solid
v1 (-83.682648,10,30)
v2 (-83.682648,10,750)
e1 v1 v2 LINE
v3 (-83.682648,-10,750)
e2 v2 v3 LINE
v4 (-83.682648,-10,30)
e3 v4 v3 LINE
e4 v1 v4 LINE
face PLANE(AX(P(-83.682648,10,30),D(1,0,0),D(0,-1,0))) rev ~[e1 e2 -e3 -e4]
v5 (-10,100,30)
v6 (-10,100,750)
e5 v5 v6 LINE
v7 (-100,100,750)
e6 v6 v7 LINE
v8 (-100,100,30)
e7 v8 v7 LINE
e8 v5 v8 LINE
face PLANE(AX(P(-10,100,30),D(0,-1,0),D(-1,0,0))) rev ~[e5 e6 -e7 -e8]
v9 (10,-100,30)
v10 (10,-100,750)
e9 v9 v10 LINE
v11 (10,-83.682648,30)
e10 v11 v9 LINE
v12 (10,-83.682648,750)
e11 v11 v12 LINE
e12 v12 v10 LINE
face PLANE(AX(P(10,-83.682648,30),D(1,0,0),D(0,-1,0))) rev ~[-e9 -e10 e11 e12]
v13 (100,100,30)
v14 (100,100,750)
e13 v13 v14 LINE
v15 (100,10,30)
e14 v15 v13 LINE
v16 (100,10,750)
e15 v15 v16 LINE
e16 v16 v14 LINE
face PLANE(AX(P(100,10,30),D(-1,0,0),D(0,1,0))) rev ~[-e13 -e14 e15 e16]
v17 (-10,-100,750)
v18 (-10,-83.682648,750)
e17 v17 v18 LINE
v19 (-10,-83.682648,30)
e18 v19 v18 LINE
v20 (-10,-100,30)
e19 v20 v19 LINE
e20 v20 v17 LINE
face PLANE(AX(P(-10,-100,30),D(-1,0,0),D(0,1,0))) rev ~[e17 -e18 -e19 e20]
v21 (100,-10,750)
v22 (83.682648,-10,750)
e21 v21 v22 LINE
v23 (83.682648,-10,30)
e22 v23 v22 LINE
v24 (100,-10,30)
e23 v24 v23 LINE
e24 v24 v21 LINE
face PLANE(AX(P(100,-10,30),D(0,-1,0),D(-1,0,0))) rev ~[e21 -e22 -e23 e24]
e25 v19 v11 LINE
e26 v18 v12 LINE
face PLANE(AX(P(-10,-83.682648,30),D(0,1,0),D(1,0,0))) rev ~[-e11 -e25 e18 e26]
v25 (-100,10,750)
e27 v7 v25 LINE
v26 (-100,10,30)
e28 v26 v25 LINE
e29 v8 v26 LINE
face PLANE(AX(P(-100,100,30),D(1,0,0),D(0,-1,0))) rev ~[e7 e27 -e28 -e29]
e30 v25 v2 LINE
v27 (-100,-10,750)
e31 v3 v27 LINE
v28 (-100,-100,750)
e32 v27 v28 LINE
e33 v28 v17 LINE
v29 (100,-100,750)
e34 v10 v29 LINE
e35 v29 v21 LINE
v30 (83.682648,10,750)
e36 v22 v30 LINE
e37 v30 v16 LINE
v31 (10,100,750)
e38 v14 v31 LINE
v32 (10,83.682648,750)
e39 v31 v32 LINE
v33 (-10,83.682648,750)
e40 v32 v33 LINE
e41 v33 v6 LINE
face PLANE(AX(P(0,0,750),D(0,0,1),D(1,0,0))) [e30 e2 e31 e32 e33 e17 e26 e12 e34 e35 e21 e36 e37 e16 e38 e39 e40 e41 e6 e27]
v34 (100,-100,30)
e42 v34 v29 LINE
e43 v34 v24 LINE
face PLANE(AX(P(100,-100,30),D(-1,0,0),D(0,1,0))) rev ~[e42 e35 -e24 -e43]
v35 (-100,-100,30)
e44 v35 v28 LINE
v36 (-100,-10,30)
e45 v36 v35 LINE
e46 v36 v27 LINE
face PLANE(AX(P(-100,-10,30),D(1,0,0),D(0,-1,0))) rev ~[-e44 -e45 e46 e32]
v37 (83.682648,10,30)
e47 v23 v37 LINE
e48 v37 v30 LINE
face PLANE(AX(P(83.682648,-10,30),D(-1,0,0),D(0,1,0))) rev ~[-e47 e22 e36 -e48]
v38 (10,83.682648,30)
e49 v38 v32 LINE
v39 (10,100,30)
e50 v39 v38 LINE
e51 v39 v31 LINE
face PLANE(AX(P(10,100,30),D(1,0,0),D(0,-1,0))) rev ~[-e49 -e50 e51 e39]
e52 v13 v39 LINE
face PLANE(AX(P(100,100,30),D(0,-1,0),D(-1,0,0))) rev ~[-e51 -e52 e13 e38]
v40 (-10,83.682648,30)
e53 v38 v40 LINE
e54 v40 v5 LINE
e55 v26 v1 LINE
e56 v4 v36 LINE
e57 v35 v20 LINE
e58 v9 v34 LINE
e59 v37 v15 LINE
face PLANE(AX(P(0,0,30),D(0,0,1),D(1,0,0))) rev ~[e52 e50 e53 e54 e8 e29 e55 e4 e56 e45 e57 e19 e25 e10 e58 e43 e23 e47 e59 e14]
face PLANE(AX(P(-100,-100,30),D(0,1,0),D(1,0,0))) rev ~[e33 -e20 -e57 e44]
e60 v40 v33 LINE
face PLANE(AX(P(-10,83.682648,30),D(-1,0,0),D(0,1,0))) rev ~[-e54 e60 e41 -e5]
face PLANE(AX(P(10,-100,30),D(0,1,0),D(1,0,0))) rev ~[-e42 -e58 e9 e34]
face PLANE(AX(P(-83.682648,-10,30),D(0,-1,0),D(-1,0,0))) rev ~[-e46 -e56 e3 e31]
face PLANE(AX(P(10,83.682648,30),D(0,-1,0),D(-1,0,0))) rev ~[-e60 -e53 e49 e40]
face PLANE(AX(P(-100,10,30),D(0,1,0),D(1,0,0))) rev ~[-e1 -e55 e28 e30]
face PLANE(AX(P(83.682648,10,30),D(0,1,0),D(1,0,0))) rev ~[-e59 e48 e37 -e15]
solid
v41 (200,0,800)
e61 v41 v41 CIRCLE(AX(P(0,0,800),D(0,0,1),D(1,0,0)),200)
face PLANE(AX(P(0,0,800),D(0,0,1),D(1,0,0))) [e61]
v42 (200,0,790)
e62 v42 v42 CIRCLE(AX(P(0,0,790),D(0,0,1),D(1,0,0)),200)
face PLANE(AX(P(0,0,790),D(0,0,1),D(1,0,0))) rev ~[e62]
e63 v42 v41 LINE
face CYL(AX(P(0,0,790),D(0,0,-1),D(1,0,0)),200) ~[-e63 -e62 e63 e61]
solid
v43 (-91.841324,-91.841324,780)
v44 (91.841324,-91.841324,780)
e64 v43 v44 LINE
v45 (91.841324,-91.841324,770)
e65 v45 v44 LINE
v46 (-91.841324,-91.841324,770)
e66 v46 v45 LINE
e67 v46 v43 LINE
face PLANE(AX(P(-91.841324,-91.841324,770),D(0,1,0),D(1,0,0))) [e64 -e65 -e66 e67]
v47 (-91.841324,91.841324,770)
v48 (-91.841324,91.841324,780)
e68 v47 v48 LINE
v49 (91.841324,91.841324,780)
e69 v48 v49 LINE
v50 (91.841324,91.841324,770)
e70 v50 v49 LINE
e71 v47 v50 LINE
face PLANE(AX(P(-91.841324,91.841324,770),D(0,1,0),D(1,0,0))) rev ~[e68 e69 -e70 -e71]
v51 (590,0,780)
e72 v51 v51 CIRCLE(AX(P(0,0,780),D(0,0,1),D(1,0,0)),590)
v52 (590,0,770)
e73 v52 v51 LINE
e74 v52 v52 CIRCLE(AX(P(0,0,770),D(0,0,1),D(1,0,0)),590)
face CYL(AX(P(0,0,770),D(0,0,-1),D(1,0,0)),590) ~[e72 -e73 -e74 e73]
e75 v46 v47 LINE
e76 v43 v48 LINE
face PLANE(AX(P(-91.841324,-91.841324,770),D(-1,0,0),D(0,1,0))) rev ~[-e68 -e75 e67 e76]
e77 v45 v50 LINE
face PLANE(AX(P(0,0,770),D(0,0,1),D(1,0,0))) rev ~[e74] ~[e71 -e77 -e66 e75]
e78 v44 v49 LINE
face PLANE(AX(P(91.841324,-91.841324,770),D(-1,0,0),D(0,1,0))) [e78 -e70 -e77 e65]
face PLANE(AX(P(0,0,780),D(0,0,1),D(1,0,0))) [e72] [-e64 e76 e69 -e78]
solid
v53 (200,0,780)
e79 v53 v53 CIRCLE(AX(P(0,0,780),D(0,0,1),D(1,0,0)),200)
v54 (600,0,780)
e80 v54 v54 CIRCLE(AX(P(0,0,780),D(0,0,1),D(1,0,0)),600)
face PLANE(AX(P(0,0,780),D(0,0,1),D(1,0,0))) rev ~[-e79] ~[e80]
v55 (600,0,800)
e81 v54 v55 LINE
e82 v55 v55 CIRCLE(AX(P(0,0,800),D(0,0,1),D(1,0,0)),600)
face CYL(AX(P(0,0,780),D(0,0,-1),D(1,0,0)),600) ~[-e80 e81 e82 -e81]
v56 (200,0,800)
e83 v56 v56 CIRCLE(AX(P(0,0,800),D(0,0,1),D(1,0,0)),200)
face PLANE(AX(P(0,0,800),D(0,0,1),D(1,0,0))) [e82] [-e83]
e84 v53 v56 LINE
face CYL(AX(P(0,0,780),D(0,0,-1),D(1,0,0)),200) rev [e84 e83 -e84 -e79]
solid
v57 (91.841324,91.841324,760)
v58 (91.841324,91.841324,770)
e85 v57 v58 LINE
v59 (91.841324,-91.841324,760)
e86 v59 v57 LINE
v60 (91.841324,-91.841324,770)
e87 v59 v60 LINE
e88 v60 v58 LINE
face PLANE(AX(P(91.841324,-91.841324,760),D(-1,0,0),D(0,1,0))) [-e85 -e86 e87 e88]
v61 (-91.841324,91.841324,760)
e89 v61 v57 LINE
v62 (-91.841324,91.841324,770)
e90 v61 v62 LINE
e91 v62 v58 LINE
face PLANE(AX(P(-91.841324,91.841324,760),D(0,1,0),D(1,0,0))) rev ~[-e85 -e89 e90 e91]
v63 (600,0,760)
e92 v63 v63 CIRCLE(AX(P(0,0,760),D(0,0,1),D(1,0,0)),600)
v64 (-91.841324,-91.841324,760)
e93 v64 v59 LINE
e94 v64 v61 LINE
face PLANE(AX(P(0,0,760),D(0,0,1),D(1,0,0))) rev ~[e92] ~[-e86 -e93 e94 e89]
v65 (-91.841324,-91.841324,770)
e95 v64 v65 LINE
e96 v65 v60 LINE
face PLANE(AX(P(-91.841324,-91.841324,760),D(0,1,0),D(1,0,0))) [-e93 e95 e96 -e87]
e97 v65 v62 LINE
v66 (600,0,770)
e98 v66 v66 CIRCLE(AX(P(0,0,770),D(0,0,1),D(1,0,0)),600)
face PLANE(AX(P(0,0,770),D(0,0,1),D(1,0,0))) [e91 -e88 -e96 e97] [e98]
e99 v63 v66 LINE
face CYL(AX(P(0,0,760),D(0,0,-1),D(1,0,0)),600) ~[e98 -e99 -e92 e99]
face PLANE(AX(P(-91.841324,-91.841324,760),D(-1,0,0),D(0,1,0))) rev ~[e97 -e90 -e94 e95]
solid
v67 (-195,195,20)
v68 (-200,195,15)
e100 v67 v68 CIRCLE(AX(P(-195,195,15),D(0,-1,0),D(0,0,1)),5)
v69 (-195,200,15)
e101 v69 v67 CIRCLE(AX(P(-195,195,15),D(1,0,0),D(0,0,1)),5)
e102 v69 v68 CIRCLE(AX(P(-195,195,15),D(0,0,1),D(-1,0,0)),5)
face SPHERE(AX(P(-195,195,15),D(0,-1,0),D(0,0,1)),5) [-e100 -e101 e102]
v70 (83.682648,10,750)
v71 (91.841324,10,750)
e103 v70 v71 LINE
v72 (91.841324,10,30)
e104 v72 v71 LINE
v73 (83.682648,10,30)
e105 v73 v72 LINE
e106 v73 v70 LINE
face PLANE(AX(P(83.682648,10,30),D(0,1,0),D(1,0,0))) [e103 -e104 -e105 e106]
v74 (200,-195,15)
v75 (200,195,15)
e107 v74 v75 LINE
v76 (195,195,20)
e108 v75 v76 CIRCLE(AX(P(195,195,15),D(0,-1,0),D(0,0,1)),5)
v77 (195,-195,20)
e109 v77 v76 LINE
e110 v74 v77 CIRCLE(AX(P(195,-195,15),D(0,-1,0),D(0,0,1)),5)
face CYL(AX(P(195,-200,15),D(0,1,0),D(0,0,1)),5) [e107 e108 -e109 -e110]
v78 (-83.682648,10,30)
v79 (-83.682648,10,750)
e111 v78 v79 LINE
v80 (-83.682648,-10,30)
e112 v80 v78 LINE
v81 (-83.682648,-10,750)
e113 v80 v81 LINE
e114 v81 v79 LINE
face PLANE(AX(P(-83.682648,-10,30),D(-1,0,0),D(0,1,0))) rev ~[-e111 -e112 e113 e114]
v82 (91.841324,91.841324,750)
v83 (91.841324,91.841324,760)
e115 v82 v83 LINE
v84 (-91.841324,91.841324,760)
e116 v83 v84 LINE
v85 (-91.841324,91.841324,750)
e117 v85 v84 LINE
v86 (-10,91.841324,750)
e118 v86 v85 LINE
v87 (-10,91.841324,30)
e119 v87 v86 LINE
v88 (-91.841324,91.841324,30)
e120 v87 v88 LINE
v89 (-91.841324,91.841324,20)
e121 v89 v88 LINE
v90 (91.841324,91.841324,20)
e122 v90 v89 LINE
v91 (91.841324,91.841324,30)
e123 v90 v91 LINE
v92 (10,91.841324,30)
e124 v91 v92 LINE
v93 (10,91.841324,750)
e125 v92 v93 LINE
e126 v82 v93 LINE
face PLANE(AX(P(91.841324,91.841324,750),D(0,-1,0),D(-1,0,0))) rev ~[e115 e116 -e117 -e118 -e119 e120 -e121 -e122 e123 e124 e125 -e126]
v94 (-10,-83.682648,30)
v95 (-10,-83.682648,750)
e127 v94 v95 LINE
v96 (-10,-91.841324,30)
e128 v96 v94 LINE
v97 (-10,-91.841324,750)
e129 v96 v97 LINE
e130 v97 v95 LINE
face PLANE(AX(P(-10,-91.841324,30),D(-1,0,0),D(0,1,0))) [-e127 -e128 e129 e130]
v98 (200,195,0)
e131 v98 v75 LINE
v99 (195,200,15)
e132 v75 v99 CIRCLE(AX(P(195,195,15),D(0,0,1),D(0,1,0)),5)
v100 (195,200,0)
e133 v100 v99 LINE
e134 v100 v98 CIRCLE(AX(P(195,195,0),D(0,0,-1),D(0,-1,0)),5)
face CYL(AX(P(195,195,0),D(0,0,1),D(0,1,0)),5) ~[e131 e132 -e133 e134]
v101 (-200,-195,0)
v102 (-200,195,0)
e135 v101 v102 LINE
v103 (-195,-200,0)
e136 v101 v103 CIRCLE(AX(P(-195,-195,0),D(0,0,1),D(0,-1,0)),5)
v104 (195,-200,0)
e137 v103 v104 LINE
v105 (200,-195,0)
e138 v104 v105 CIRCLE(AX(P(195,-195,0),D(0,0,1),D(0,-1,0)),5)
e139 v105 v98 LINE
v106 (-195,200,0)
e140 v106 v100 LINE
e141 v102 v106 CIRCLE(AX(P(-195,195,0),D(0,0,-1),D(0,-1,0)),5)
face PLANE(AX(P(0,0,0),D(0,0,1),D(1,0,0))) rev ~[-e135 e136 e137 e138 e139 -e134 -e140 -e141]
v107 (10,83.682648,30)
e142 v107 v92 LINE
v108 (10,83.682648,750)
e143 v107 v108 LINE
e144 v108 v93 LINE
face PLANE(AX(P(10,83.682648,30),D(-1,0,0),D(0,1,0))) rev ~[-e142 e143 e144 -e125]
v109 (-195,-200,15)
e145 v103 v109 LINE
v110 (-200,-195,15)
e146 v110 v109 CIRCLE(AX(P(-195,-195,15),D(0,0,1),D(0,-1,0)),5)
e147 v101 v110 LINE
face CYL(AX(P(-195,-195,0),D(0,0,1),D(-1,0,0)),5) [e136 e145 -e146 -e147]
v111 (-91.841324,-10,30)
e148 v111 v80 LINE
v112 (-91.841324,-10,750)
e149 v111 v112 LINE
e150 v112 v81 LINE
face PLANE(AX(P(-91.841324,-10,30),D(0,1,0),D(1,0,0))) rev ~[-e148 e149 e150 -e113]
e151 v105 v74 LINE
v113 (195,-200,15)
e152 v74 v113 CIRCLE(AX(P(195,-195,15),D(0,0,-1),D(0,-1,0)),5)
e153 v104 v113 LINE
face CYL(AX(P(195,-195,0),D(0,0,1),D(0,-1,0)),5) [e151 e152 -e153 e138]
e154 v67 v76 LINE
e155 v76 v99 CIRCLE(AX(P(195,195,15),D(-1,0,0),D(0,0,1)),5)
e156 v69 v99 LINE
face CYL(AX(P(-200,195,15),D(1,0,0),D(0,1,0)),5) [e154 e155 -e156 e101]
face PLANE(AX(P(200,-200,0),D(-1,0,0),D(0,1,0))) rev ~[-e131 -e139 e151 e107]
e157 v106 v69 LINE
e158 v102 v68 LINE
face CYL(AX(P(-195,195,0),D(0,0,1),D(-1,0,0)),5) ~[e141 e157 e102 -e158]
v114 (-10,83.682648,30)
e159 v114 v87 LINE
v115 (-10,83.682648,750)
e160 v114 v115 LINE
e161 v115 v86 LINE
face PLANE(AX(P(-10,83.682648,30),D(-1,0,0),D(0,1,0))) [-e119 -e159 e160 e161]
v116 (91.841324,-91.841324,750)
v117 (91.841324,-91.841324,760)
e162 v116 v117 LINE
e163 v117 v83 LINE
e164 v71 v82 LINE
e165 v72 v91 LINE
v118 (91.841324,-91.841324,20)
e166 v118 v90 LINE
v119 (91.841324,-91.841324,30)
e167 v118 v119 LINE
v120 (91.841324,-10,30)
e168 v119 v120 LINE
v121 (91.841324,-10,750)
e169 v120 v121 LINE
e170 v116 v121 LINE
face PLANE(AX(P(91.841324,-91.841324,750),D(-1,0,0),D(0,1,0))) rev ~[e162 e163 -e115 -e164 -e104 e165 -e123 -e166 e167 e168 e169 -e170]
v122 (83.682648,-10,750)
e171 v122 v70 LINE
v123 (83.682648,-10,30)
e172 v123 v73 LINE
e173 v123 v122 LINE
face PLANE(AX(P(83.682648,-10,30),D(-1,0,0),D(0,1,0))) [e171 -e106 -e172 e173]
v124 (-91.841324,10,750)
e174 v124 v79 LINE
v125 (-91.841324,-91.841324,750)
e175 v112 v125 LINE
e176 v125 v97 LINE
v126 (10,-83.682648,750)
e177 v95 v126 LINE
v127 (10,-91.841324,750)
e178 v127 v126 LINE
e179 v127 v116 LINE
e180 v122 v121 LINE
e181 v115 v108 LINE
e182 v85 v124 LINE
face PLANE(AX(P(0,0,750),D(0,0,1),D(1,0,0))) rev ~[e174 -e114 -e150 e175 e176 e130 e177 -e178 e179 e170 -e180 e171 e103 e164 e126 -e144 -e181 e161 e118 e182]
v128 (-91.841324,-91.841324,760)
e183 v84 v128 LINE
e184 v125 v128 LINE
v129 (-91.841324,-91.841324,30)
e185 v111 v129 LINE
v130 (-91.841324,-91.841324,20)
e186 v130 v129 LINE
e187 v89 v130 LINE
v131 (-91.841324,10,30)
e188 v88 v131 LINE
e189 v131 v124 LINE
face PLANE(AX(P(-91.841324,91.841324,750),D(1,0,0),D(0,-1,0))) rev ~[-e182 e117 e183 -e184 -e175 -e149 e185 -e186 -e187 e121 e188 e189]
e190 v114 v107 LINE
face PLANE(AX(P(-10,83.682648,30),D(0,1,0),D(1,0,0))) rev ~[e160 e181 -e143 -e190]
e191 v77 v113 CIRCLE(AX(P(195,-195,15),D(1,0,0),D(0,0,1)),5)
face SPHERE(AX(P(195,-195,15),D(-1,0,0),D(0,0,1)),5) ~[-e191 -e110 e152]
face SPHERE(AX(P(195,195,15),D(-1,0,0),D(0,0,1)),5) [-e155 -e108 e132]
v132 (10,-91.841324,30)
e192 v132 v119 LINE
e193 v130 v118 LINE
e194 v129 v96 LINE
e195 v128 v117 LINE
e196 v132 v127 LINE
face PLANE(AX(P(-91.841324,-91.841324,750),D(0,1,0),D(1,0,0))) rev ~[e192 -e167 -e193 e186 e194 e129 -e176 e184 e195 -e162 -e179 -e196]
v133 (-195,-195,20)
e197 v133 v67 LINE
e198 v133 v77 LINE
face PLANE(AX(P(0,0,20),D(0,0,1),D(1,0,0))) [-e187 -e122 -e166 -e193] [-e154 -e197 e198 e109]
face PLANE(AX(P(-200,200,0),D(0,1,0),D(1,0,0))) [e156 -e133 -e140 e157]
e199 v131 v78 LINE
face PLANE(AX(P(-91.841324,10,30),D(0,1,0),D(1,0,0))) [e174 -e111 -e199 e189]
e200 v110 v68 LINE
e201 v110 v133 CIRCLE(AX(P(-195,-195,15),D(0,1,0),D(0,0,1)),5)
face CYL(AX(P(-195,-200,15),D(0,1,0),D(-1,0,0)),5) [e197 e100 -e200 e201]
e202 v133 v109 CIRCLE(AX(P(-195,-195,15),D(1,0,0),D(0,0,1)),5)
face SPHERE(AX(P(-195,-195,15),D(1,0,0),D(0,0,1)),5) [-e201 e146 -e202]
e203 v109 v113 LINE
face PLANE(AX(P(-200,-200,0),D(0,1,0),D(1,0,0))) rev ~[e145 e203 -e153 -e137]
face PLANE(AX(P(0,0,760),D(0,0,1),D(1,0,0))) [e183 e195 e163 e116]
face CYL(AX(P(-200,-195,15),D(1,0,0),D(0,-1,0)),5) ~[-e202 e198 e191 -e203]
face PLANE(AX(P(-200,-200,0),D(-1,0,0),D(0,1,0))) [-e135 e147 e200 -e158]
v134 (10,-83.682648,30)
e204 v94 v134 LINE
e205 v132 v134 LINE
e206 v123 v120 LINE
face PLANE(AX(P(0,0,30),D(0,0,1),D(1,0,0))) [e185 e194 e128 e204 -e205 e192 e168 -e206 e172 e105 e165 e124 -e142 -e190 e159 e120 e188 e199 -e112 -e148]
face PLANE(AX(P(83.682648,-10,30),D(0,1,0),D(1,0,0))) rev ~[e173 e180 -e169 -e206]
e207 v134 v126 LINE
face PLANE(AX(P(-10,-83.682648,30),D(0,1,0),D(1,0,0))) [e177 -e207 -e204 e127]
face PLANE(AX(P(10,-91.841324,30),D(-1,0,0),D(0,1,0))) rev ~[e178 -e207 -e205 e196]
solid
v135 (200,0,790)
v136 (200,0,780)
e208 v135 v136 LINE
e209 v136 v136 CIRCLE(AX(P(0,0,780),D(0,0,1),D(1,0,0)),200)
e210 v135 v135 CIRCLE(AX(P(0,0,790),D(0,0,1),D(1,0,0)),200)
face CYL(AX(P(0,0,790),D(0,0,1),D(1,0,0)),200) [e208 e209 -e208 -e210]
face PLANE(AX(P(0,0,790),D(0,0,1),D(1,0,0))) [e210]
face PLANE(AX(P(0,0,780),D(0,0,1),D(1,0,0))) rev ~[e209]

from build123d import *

# Parameters (mm, degrees)
F1_START  = 30
F1_DEPTH  = 720
F2_START  = 30
F0_W      = 20
F0_H      = 8.1586758983
F2_DEPTH  = 720
F0_W_2    = 8.1586758983
F0_H_2    = 20
F3_START  = 20
F3_DEPTH  = 10
F4_START  = 750
F4_DEPTH  = 10
F0_W_3    = 400
F0_H_3    = 400
F5_DEPTH  = 20
F7_START  = 20
F6_R      = 600
F6_R_2    = 590
F6_R_3    = 200
F7_DEPTH  = 20
F8_START  = 10
F6_W      = 183.6826482035
F6_H      = 183.6826482035
F8_DEPTH  = 10
F9_DEPTH  = 10
F10_START = 30
F10_DEPTH = 10
F11_DEPTH = 10
F12_R     = 5


with BuildPart() as f1:
    # F0 (on Top) → F1 (new body)
    with BuildSketch(Plane.XY.offset(F1_START)):
        Polygon((10, 83.6826482035), (-10, 83.6826482035), (-10, 91.8413241017), (-91.8413241017, 91.8413241017), (-91.8413241017, 10), (-83.6826482035, 10), (-83.6826482035, -10), (-91.8413241017, -10), (-91.8413241017, -91.8413241017), (-10, -91.8413241017), (-10, -83.6826482035), (10, -83.6826482035), (10, -91.8413241017), (91.8413241017, -91.8413241017), (91.8413241017, -10), (83.6826482035, -10), (83.6826482035, 10), (91.8413241017, 10), (91.8413241017, 91.8413241017), (10, 91.8413241017), align=None)
        Polygon((-91.8413241017, 91.8413241017), (-10, 91.8413241017), (-10, 100), (-100, 100), (-100, 10), (-91.8413241017, 10), align=None)
        Polygon((-91.8413241017, -91.8413241017), (-91.8413241017, -10), (-100, -10), (-100, -100), (-10, -100), (-10, -91.8413241017), align=None)
        Polygon((100, -10), (91.8413241017, -10), (91.8413241017, -91.8413241017), (10, -91.8413241017), (10, -100), (100, -100), align=None)
        Polygon((10, 100), (10, 91.8413241017), (91.8413241017, 91.8413241017), (91.8413241017, 10), (100, 10), (100, 100), align=None)
    extrude(amount=F1_DEPTH)


with BuildPart() as f2:
    # F0 (on Top) → F2 (new body)
    with BuildSketch(Plane.XY.offset(F2_START)):
        with Locations((0, -87.7619861526)):
            Rectangle(F0_W, F0_H)
    extrude(amount=F2_DEPTH)



with BuildPart() as f2b:
    # F0 (on Top) → F2, piece 2 (new body)
    with BuildSketch(Plane.XY.offset(F2_START)):
        with Locations((87.7619861526, 0)):
            Rectangle(F0_W_2, F0_H_2)
    extrude(amount=F2_DEPTH)


with BuildPart() as f2c:
    # F0 (on Top) → F2, piece 3 (new body)
    with BuildSketch(Plane.XY.offset(F2_START)):
        with Locations((0, 87.7619861526)):
            Rectangle(F0_W, F0_H)
    extrude(amount=F2_DEPTH)


with BuildPart() as f2d:
    # F0 (on Top) → F2, piece 4 (new body)
    with BuildSketch(Plane.XY.offset(F2_START)):
        with Locations((-87.7619861526, 0)):
            Rectangle(F0_W_2, F0_H_2)
    extrude(amount=F2_DEPTH)


with BuildPart() as f2_1:
    add(f2.part)

    add(f2b.part)  # F3 merges F2b

    add(f2c.part)  # F3 merges F2c

    add(f2d.part)  # F3 merges F2d
    # F0 (on Top) → F3 (join)
    with BuildSketch(Plane.XY.offset(F3_START)):
        Polygon((10, 83.6826482035), (-10, 83.6826482035), (-10, 91.8413241017), (-91.8413241017, 91.8413241017), (-91.8413241017, 10), (-83.6826482035, 10), (-83.6826482035, -10), (-91.8413241017, -10), (-91.8413241017, -91.8413241017), (-10, -91.8413241017), (-10, -83.6826482035), (10, -83.6826482035), (10, -91.8413241017), (91.8413241017, -91.8413241017), (91.8413241017, -10), (83.6826482035, -10), (83.6826482035, 10), (91.8413241017, 10), (91.8413241017, 91.8413241017), (10, 91.8413241017), align=None)
        with Locations((0, -87.7619861526)):
            Rectangle(F0_W, F0_H)
        with Locations((87.7619861526, 0)):
            Rectangle(F0_W_2, F0_H_2)
        with Locations((0, 87.7619861526)):
            Rectangle(F0_W, F0_H)
        with Locations((-87.7619861526, 0)):
            Rectangle(F0_W_2, F0_H_2)
    extrude(amount=F3_DEPTH)

    # F0 (on Top) → F4 (join)
    with BuildSketch(Plane.XY.offset(F4_START)):
        Polygon((10, 83.6826482035), (-10, 83.6826482035), (-10, 91.8413241017), (-91.8413241017, 91.8413241017), (-91.8413241017, 10), (-83.6826482035, 10), (-83.6826482035, -10), (-91.8413241017, -10), (-91.8413241017, -91.8413241017), (-10, -91.8413241017), (-10, -83.6826482035), (10, -83.6826482035), (10, -91.8413241017), (91.8413241017, -91.8413241017), (91.8413241017, -10), (83.6826482035, -10), (83.6826482035, 10), (91.8413241017, 10), (91.8413241017, 91.8413241017), (10, 91.8413241017), align=None)
        with Locations((0, 87.7619861526)):
            Rectangle(F0_W, F0_H)
        with Locations((-87.7619861526, 0)):
            Rectangle(F0_W_2, F0_H_2)
        with Locations((0, -87.7619861526)):
            Rectangle(F0_W, F0_H)
        with Locations((87.7619861526, 0)):
            Rectangle(F0_W_2, F0_H_2)
    extrude(amount=F4_DEPTH)

    # F0 (on Top) → F5 (join)
    with BuildSketch(Plane.XY):
        Rectangle(F0_W_3, F0_H_3)
        Polygon((-10, 100), (-10, 91.8413241017), (10, 91.8413241017), (10, 100), (100, 100), (100, 10), (91.8413241017, 10), (91.8413241017, -10), (100, -10), (100, -100), (10, -100), (10, -91.8413241017), (-10, -91.8413241017), (-10, -100), (-100, -100), (-100, -10), (-91.8413241017, -10), (-91.8413241017, 10), (-100, 10), (-100, 100), align=None, mode=Mode.SUBTRACT)
        Polygon((-91.8413241017, 91.8413241017), (-10, 91.8413241017), (-10, 100), (-100, 100), (-100, 10), (-91.8413241017, 10), align=None)
        Polygon((10, 100), (10, 91.8413241017), (91.8413241017, 91.8413241017), (91.8413241017, 10), (100, 10), (100, 100), align=None)
        Polygon((100, -10), (91.8413241017, -10), (91.8413241017, -91.8413241017), (10, -91.8413241017), (10, -100), (100, -100), align=None)
        Polygon((-91.8413241017, -91.8413241017), (-91.8413241017, -10), (-100, -10), (-100, -100), (-10, -100), (-10, -91.8413241017), align=None)
        with Locations((-87.7619861526, 0)):
            Rectangle(F0_W_2, F0_H_2)
        with Locations((0, 87.7619861526)):
            Rectangle(F0_W, F0_H)
        with Locations((87.7619861526, 0)):
            Rectangle(F0_W_2, F0_H_2)
        with Locations((0, -87.7619861526)):
            Rectangle(F0_W, F0_H)
        Polygon((10, 83.6826482035), (-10, 83.6826482035), (-10, 91.8413241017), (-91.8413241017, 91.8413241017), (-91.8413241017, 10), (-83.6826482035, 10), (-83.6826482035, -10), (-91.8413241017, -10), (-91.8413241017, -91.8413241017), (-10, -91.8413241017), (-10, -83.6826482035), (10, -83.6826482035), (10, -91.8413241017), (91.8413241017, -91.8413241017), (91.8413241017, -10), (83.6826482035, -10), (83.6826482035, 10), (91.8413241017, 10), (91.8413241017, 91.8413241017), (10, 91.8413241017), align=None)
    extrude(amount=F5_DEPTH)

    # F12
    f12_edges = [f2_1.edges().sort_by_distance(p)[0] for p in [
        (0, -200, 20),
        (-200, 0, 20),
        (0, 200, 20),
        (200, 0, 20),
        (200, 200, 10),
        (-200, 200, 10),
        (-200, -200, 10),
        (200, -200, 10),
    ]]
    fillet(f12_edges, radius=F12_R)


with BuildPart() as f7:
    # F6 (on face) → F7 (new body)
    with BuildSketch(Plane.XY.offset(760).offset(F7_START)):
        Circle(F6_R)
        Circle(F6_R_2, mode=Mode.SUBTRACT)
        Circle(F6_R_2)
        Circle(F6_R_3, mode=Mode.SUBTRACT)
    extrude(amount=F7_DEPTH)


with BuildPart() as f8:
    # F6 (on face) → F8 (new body)
    with BuildSketch(Plane.XY.offset(760).offset(F8_START)):
        Circle(F6_R_2)
        Circle(F6_R_3, mode=Mode.SUBTRACT)
        Circle(F6_R_3)
        Rectangle(F6_W, F6_H, mode=Mode.SUBTRACT)
    extrude(amount=F8_DEPTH)


with BuildPart() as f9:
    # F6 (on face) → F9 (new body)
    with BuildSketch(Plane.XY.offset(760)):
        Circle(F6_R)
        Circle(F6_R_2, mode=Mode.SUBTRACT)
        Circle(F6_R_2)
        Circle(F6_R_3, mode=Mode.SUBTRACT)
        Circle(F6_R_3)
        Rectangle(F6_W, F6_H, mode=Mode.SUBTRACT)
    extrude(amount=F9_DEPTH)


with BuildPart() as f10:
    # F6 (on face) → F10 (new body)
    with BuildSketch(Plane.XY.offset(760).offset(F10_START)):
        Circle(F6_R_3)
        Rectangle(F6_W, F6_H, mode=Mode.SUBTRACT)
        Rectangle(F6_W, F6_H)
    extrude(amount=F10_DEPTH)


with BuildPart() as f11:
    # F11 (new): a face of the model
    f11_faces = [f10.part.faces().sort_by_distance(p)[0] for p in [
        (0, 0, 790),
    ]]
    extrude(f11_faces, amount=F11_DEPTH)


solid = Compound([f1.part, f2_1.part, f7.part, f8.part, f9.part, f10.part, f11.part])
